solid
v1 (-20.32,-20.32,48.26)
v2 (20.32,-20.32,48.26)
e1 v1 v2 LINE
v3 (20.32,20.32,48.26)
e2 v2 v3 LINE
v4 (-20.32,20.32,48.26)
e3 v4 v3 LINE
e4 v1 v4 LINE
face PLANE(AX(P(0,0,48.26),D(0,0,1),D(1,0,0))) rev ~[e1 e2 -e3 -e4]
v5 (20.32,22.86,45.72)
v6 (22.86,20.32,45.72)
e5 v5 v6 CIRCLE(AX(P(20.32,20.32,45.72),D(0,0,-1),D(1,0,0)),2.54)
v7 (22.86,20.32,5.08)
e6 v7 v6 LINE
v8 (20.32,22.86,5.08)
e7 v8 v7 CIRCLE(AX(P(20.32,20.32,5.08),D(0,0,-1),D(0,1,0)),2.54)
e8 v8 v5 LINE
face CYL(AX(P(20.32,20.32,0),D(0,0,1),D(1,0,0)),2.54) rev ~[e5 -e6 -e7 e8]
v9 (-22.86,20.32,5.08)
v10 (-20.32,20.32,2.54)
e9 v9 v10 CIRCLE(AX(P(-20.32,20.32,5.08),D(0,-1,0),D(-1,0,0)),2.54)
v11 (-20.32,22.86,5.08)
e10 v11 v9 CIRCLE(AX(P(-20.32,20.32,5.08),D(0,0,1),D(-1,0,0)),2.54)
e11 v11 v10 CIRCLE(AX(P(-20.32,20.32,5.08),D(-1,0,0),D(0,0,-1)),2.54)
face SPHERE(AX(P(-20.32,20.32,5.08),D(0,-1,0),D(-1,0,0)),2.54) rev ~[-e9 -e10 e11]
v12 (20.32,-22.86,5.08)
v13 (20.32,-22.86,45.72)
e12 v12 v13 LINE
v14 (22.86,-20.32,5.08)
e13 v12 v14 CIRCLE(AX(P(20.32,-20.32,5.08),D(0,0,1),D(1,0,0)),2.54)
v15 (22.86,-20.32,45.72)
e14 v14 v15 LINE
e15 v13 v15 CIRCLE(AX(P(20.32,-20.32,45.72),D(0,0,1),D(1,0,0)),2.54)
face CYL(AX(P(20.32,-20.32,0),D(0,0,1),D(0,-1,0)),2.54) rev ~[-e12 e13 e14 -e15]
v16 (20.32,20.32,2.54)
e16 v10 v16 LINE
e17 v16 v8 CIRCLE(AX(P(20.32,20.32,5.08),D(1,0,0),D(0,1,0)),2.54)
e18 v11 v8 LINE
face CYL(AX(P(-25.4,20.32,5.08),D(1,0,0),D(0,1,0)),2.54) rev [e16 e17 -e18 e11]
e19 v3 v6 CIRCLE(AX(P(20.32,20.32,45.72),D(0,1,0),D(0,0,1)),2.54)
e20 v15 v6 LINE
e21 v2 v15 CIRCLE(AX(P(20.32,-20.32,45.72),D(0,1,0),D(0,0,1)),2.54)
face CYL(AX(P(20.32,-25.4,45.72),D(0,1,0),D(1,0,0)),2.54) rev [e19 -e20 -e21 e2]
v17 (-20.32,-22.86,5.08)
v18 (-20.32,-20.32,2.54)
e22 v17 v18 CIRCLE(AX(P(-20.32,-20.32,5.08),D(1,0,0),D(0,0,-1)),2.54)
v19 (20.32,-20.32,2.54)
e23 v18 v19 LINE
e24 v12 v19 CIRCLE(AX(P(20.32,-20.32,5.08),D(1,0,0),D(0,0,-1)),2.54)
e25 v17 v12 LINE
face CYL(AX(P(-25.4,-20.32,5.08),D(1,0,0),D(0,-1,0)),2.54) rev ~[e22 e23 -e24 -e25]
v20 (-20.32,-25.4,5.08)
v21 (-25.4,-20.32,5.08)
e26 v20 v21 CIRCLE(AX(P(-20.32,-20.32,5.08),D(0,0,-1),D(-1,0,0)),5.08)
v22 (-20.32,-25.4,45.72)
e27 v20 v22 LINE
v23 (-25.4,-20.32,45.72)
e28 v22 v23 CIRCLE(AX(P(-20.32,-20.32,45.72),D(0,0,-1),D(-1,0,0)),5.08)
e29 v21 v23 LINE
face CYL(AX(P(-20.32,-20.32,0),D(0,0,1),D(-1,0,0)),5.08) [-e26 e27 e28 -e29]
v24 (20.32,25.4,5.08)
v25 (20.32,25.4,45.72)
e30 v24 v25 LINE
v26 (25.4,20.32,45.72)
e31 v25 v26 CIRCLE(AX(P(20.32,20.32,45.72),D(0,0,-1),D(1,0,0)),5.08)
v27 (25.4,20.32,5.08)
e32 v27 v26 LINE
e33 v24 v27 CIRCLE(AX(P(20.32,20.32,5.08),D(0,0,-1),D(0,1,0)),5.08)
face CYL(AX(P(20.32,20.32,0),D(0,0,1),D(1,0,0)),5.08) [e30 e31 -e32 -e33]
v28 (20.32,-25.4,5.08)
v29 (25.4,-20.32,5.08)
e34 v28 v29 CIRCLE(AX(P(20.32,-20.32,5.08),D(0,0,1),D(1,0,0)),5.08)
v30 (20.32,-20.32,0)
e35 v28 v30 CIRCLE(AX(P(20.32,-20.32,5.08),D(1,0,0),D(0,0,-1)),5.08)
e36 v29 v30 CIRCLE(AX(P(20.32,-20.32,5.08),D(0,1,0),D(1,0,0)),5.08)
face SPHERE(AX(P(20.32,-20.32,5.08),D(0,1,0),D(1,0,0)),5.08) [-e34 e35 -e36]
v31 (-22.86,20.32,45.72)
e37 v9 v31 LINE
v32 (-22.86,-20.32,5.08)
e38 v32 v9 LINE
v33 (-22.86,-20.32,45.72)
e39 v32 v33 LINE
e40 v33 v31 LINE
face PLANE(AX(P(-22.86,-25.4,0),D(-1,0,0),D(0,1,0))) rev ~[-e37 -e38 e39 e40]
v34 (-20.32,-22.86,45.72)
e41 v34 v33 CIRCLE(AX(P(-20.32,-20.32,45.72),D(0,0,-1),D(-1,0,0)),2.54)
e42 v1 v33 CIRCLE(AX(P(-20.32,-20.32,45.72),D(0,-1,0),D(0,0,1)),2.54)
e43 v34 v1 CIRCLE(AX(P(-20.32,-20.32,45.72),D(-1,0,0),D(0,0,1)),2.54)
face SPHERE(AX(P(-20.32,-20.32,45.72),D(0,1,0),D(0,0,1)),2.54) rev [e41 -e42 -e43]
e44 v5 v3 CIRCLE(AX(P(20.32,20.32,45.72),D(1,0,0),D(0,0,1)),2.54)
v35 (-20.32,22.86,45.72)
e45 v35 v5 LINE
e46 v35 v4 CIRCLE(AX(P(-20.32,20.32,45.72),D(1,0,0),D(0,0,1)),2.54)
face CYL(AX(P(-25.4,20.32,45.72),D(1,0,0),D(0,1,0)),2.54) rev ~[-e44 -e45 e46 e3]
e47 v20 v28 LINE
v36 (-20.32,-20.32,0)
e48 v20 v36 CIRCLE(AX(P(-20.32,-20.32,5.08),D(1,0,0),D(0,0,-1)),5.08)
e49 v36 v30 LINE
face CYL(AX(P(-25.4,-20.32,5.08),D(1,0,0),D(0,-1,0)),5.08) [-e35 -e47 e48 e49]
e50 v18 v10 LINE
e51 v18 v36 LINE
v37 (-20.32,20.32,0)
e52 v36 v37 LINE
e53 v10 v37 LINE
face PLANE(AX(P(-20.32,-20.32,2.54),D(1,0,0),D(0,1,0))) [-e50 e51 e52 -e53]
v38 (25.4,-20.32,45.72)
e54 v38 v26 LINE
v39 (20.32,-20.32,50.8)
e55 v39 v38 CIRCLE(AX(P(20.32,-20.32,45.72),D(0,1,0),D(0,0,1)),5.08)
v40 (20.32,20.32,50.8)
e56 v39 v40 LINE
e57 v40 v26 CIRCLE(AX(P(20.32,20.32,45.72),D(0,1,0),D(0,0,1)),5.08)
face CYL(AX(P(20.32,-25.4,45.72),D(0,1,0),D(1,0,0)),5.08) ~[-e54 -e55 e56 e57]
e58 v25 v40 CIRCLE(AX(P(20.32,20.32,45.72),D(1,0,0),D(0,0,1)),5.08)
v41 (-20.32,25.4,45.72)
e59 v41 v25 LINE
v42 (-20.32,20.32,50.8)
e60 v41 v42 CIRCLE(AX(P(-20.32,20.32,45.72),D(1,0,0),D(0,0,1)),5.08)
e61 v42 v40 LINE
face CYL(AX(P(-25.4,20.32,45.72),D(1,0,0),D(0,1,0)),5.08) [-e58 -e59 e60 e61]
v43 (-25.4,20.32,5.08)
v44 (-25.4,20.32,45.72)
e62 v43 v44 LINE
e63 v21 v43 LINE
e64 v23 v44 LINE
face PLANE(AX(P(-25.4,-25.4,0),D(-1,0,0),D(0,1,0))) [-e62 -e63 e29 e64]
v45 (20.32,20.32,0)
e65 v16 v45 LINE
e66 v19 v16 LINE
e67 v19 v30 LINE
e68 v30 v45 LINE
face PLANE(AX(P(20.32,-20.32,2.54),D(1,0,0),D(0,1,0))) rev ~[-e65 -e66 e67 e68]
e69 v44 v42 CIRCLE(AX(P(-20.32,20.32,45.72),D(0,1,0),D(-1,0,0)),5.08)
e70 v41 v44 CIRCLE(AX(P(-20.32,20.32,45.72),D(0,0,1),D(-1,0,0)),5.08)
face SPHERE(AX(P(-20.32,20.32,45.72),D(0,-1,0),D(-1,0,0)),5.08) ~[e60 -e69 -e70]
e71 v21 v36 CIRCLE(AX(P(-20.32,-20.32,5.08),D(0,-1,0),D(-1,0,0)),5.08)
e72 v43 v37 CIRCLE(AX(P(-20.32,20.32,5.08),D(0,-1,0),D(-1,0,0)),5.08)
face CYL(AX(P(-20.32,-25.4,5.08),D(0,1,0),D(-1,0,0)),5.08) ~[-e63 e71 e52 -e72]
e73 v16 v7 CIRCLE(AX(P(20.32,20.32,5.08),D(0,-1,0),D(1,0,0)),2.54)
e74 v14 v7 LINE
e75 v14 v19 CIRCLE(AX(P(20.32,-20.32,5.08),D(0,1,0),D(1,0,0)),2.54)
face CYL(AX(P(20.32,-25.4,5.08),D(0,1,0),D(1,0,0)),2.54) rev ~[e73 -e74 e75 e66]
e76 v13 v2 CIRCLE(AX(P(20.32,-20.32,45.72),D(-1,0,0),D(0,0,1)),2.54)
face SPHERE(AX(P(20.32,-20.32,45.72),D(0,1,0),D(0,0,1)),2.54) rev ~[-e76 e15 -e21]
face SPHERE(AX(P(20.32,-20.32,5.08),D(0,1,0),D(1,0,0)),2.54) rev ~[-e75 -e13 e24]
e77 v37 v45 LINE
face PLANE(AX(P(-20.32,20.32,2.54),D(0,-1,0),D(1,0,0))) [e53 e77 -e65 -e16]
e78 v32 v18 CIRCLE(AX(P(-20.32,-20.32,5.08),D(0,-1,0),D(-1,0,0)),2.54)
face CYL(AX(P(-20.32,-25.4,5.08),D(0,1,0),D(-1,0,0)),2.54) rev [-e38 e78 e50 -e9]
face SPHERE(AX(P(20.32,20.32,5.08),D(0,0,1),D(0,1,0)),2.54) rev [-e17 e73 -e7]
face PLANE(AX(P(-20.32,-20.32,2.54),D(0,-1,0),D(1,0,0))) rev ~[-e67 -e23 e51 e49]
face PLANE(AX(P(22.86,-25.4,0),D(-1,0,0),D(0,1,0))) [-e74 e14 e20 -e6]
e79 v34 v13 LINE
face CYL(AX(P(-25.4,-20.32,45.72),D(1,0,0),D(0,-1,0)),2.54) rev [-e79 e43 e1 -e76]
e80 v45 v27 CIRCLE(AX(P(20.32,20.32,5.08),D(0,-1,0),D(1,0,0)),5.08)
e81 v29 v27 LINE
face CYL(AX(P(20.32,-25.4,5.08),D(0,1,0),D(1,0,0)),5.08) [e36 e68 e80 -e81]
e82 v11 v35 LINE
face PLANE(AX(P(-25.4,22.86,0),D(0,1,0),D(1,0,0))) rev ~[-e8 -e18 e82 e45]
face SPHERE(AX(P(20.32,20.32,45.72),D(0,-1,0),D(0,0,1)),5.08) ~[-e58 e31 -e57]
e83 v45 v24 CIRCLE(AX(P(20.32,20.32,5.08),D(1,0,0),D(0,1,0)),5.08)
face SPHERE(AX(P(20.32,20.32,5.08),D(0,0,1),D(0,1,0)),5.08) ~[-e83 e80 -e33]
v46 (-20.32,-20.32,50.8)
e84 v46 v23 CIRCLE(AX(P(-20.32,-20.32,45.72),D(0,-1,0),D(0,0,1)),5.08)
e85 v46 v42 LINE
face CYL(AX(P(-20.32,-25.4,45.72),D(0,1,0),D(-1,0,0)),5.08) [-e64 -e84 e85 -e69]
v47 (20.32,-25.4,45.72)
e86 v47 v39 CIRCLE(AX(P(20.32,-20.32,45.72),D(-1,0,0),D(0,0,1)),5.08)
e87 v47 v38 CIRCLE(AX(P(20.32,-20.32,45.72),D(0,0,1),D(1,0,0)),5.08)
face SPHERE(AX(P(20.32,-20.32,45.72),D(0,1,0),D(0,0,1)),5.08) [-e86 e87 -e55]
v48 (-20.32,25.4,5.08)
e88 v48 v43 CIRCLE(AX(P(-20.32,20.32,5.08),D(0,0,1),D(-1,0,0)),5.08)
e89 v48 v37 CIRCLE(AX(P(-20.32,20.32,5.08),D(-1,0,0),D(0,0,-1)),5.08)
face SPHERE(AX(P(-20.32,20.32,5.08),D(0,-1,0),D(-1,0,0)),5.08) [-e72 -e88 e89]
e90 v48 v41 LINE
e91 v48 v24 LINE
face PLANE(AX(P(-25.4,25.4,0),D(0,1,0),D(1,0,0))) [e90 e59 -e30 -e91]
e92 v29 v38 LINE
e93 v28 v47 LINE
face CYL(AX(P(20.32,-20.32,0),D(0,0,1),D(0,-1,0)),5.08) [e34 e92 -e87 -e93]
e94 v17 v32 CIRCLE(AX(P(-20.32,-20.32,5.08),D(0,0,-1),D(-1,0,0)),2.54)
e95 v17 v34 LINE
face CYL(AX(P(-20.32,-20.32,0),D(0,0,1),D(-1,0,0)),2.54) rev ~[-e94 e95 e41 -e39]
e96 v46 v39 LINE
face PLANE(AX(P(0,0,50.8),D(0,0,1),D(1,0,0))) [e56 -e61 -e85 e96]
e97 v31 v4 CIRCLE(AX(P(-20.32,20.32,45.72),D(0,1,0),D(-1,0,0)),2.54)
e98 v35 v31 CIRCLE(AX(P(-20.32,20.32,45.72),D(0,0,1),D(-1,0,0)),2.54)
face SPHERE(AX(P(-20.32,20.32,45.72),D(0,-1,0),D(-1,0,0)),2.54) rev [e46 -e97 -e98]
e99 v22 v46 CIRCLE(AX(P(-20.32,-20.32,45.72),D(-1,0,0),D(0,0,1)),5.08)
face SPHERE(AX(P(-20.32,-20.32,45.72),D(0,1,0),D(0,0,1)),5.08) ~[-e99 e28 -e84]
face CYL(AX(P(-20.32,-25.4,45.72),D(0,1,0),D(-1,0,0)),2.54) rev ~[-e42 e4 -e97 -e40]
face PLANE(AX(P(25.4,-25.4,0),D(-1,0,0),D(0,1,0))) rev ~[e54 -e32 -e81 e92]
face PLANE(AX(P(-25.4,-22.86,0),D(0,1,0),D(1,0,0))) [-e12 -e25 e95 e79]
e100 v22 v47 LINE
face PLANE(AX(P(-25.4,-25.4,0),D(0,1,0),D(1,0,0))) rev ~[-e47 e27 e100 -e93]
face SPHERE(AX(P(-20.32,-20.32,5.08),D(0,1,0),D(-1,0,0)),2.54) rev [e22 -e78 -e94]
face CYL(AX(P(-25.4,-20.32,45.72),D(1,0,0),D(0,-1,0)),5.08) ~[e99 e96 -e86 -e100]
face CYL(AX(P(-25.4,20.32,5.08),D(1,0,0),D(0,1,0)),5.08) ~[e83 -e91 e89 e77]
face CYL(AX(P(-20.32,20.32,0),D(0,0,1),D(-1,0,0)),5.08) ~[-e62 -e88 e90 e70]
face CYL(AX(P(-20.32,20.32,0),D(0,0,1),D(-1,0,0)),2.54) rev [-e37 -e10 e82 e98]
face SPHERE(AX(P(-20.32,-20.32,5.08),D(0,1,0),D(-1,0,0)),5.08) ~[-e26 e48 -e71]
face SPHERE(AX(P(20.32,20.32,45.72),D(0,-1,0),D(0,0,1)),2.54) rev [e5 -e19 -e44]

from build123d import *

# Parameters (mm, degrees)
F0_W     = 50.8
F0_H     = 50.8
F1_DEPTH = 50.8
F2_R     = 5.08
F3_T     = -2.54


# Not quite as in the source:
# - a shell that OpenCascade refuses in one call is made with other operations: the cavity is built on its own and cut out


with BuildPart() as f1:
    # F0 (on Top) → F1 (new body)
    with BuildSketch(Plane.XY):
        Rectangle(F0_W, F0_H)
    extrude(amount=F1_DEPTH)

    # F2
    f2_edges = [f1.edges().sort_by_distance(p)[0] for p in [
        (-25.4, 0, 0),
        (-25.4, 0, 50.8),
        (-25.4, 25.4, 25.4),
        (25.4, 0, 50.8),
        (0, 25.4, 50.8),
        (0, -25.4, 50.8),
        (-25.4, -25.4, 25.4),
        (25.4, 25.4, 25.4),
        (0, 25.4, 0),
        (25.4, 0, 0),
        (25.4, -25.4, 25.4),
        (0, -25.4, 0),
    ]]
    fillet(f2_edges, radius=F2_R)

    # F3: a shell. OpenCascade refuses it in one call, so the cavity is built on its own and cut out:
    # the body offset inwards by the wall thickness, plus a prism from it out through each open face.
    f3_core = offset(f1.part, amount=F3_T, mode=Mode.PRIVATE)
    f3_exits = [f3_core.faces().sort_by_distance(p)[0] for p in [
        (0, 0, 2.54),
    ]]
    add(f3_core, mode=Mode.SUBTRACT)
    extrude(f3_exits, amount=-F3_T, mode=Mode.SUBTRACT)


solid = f1.part
